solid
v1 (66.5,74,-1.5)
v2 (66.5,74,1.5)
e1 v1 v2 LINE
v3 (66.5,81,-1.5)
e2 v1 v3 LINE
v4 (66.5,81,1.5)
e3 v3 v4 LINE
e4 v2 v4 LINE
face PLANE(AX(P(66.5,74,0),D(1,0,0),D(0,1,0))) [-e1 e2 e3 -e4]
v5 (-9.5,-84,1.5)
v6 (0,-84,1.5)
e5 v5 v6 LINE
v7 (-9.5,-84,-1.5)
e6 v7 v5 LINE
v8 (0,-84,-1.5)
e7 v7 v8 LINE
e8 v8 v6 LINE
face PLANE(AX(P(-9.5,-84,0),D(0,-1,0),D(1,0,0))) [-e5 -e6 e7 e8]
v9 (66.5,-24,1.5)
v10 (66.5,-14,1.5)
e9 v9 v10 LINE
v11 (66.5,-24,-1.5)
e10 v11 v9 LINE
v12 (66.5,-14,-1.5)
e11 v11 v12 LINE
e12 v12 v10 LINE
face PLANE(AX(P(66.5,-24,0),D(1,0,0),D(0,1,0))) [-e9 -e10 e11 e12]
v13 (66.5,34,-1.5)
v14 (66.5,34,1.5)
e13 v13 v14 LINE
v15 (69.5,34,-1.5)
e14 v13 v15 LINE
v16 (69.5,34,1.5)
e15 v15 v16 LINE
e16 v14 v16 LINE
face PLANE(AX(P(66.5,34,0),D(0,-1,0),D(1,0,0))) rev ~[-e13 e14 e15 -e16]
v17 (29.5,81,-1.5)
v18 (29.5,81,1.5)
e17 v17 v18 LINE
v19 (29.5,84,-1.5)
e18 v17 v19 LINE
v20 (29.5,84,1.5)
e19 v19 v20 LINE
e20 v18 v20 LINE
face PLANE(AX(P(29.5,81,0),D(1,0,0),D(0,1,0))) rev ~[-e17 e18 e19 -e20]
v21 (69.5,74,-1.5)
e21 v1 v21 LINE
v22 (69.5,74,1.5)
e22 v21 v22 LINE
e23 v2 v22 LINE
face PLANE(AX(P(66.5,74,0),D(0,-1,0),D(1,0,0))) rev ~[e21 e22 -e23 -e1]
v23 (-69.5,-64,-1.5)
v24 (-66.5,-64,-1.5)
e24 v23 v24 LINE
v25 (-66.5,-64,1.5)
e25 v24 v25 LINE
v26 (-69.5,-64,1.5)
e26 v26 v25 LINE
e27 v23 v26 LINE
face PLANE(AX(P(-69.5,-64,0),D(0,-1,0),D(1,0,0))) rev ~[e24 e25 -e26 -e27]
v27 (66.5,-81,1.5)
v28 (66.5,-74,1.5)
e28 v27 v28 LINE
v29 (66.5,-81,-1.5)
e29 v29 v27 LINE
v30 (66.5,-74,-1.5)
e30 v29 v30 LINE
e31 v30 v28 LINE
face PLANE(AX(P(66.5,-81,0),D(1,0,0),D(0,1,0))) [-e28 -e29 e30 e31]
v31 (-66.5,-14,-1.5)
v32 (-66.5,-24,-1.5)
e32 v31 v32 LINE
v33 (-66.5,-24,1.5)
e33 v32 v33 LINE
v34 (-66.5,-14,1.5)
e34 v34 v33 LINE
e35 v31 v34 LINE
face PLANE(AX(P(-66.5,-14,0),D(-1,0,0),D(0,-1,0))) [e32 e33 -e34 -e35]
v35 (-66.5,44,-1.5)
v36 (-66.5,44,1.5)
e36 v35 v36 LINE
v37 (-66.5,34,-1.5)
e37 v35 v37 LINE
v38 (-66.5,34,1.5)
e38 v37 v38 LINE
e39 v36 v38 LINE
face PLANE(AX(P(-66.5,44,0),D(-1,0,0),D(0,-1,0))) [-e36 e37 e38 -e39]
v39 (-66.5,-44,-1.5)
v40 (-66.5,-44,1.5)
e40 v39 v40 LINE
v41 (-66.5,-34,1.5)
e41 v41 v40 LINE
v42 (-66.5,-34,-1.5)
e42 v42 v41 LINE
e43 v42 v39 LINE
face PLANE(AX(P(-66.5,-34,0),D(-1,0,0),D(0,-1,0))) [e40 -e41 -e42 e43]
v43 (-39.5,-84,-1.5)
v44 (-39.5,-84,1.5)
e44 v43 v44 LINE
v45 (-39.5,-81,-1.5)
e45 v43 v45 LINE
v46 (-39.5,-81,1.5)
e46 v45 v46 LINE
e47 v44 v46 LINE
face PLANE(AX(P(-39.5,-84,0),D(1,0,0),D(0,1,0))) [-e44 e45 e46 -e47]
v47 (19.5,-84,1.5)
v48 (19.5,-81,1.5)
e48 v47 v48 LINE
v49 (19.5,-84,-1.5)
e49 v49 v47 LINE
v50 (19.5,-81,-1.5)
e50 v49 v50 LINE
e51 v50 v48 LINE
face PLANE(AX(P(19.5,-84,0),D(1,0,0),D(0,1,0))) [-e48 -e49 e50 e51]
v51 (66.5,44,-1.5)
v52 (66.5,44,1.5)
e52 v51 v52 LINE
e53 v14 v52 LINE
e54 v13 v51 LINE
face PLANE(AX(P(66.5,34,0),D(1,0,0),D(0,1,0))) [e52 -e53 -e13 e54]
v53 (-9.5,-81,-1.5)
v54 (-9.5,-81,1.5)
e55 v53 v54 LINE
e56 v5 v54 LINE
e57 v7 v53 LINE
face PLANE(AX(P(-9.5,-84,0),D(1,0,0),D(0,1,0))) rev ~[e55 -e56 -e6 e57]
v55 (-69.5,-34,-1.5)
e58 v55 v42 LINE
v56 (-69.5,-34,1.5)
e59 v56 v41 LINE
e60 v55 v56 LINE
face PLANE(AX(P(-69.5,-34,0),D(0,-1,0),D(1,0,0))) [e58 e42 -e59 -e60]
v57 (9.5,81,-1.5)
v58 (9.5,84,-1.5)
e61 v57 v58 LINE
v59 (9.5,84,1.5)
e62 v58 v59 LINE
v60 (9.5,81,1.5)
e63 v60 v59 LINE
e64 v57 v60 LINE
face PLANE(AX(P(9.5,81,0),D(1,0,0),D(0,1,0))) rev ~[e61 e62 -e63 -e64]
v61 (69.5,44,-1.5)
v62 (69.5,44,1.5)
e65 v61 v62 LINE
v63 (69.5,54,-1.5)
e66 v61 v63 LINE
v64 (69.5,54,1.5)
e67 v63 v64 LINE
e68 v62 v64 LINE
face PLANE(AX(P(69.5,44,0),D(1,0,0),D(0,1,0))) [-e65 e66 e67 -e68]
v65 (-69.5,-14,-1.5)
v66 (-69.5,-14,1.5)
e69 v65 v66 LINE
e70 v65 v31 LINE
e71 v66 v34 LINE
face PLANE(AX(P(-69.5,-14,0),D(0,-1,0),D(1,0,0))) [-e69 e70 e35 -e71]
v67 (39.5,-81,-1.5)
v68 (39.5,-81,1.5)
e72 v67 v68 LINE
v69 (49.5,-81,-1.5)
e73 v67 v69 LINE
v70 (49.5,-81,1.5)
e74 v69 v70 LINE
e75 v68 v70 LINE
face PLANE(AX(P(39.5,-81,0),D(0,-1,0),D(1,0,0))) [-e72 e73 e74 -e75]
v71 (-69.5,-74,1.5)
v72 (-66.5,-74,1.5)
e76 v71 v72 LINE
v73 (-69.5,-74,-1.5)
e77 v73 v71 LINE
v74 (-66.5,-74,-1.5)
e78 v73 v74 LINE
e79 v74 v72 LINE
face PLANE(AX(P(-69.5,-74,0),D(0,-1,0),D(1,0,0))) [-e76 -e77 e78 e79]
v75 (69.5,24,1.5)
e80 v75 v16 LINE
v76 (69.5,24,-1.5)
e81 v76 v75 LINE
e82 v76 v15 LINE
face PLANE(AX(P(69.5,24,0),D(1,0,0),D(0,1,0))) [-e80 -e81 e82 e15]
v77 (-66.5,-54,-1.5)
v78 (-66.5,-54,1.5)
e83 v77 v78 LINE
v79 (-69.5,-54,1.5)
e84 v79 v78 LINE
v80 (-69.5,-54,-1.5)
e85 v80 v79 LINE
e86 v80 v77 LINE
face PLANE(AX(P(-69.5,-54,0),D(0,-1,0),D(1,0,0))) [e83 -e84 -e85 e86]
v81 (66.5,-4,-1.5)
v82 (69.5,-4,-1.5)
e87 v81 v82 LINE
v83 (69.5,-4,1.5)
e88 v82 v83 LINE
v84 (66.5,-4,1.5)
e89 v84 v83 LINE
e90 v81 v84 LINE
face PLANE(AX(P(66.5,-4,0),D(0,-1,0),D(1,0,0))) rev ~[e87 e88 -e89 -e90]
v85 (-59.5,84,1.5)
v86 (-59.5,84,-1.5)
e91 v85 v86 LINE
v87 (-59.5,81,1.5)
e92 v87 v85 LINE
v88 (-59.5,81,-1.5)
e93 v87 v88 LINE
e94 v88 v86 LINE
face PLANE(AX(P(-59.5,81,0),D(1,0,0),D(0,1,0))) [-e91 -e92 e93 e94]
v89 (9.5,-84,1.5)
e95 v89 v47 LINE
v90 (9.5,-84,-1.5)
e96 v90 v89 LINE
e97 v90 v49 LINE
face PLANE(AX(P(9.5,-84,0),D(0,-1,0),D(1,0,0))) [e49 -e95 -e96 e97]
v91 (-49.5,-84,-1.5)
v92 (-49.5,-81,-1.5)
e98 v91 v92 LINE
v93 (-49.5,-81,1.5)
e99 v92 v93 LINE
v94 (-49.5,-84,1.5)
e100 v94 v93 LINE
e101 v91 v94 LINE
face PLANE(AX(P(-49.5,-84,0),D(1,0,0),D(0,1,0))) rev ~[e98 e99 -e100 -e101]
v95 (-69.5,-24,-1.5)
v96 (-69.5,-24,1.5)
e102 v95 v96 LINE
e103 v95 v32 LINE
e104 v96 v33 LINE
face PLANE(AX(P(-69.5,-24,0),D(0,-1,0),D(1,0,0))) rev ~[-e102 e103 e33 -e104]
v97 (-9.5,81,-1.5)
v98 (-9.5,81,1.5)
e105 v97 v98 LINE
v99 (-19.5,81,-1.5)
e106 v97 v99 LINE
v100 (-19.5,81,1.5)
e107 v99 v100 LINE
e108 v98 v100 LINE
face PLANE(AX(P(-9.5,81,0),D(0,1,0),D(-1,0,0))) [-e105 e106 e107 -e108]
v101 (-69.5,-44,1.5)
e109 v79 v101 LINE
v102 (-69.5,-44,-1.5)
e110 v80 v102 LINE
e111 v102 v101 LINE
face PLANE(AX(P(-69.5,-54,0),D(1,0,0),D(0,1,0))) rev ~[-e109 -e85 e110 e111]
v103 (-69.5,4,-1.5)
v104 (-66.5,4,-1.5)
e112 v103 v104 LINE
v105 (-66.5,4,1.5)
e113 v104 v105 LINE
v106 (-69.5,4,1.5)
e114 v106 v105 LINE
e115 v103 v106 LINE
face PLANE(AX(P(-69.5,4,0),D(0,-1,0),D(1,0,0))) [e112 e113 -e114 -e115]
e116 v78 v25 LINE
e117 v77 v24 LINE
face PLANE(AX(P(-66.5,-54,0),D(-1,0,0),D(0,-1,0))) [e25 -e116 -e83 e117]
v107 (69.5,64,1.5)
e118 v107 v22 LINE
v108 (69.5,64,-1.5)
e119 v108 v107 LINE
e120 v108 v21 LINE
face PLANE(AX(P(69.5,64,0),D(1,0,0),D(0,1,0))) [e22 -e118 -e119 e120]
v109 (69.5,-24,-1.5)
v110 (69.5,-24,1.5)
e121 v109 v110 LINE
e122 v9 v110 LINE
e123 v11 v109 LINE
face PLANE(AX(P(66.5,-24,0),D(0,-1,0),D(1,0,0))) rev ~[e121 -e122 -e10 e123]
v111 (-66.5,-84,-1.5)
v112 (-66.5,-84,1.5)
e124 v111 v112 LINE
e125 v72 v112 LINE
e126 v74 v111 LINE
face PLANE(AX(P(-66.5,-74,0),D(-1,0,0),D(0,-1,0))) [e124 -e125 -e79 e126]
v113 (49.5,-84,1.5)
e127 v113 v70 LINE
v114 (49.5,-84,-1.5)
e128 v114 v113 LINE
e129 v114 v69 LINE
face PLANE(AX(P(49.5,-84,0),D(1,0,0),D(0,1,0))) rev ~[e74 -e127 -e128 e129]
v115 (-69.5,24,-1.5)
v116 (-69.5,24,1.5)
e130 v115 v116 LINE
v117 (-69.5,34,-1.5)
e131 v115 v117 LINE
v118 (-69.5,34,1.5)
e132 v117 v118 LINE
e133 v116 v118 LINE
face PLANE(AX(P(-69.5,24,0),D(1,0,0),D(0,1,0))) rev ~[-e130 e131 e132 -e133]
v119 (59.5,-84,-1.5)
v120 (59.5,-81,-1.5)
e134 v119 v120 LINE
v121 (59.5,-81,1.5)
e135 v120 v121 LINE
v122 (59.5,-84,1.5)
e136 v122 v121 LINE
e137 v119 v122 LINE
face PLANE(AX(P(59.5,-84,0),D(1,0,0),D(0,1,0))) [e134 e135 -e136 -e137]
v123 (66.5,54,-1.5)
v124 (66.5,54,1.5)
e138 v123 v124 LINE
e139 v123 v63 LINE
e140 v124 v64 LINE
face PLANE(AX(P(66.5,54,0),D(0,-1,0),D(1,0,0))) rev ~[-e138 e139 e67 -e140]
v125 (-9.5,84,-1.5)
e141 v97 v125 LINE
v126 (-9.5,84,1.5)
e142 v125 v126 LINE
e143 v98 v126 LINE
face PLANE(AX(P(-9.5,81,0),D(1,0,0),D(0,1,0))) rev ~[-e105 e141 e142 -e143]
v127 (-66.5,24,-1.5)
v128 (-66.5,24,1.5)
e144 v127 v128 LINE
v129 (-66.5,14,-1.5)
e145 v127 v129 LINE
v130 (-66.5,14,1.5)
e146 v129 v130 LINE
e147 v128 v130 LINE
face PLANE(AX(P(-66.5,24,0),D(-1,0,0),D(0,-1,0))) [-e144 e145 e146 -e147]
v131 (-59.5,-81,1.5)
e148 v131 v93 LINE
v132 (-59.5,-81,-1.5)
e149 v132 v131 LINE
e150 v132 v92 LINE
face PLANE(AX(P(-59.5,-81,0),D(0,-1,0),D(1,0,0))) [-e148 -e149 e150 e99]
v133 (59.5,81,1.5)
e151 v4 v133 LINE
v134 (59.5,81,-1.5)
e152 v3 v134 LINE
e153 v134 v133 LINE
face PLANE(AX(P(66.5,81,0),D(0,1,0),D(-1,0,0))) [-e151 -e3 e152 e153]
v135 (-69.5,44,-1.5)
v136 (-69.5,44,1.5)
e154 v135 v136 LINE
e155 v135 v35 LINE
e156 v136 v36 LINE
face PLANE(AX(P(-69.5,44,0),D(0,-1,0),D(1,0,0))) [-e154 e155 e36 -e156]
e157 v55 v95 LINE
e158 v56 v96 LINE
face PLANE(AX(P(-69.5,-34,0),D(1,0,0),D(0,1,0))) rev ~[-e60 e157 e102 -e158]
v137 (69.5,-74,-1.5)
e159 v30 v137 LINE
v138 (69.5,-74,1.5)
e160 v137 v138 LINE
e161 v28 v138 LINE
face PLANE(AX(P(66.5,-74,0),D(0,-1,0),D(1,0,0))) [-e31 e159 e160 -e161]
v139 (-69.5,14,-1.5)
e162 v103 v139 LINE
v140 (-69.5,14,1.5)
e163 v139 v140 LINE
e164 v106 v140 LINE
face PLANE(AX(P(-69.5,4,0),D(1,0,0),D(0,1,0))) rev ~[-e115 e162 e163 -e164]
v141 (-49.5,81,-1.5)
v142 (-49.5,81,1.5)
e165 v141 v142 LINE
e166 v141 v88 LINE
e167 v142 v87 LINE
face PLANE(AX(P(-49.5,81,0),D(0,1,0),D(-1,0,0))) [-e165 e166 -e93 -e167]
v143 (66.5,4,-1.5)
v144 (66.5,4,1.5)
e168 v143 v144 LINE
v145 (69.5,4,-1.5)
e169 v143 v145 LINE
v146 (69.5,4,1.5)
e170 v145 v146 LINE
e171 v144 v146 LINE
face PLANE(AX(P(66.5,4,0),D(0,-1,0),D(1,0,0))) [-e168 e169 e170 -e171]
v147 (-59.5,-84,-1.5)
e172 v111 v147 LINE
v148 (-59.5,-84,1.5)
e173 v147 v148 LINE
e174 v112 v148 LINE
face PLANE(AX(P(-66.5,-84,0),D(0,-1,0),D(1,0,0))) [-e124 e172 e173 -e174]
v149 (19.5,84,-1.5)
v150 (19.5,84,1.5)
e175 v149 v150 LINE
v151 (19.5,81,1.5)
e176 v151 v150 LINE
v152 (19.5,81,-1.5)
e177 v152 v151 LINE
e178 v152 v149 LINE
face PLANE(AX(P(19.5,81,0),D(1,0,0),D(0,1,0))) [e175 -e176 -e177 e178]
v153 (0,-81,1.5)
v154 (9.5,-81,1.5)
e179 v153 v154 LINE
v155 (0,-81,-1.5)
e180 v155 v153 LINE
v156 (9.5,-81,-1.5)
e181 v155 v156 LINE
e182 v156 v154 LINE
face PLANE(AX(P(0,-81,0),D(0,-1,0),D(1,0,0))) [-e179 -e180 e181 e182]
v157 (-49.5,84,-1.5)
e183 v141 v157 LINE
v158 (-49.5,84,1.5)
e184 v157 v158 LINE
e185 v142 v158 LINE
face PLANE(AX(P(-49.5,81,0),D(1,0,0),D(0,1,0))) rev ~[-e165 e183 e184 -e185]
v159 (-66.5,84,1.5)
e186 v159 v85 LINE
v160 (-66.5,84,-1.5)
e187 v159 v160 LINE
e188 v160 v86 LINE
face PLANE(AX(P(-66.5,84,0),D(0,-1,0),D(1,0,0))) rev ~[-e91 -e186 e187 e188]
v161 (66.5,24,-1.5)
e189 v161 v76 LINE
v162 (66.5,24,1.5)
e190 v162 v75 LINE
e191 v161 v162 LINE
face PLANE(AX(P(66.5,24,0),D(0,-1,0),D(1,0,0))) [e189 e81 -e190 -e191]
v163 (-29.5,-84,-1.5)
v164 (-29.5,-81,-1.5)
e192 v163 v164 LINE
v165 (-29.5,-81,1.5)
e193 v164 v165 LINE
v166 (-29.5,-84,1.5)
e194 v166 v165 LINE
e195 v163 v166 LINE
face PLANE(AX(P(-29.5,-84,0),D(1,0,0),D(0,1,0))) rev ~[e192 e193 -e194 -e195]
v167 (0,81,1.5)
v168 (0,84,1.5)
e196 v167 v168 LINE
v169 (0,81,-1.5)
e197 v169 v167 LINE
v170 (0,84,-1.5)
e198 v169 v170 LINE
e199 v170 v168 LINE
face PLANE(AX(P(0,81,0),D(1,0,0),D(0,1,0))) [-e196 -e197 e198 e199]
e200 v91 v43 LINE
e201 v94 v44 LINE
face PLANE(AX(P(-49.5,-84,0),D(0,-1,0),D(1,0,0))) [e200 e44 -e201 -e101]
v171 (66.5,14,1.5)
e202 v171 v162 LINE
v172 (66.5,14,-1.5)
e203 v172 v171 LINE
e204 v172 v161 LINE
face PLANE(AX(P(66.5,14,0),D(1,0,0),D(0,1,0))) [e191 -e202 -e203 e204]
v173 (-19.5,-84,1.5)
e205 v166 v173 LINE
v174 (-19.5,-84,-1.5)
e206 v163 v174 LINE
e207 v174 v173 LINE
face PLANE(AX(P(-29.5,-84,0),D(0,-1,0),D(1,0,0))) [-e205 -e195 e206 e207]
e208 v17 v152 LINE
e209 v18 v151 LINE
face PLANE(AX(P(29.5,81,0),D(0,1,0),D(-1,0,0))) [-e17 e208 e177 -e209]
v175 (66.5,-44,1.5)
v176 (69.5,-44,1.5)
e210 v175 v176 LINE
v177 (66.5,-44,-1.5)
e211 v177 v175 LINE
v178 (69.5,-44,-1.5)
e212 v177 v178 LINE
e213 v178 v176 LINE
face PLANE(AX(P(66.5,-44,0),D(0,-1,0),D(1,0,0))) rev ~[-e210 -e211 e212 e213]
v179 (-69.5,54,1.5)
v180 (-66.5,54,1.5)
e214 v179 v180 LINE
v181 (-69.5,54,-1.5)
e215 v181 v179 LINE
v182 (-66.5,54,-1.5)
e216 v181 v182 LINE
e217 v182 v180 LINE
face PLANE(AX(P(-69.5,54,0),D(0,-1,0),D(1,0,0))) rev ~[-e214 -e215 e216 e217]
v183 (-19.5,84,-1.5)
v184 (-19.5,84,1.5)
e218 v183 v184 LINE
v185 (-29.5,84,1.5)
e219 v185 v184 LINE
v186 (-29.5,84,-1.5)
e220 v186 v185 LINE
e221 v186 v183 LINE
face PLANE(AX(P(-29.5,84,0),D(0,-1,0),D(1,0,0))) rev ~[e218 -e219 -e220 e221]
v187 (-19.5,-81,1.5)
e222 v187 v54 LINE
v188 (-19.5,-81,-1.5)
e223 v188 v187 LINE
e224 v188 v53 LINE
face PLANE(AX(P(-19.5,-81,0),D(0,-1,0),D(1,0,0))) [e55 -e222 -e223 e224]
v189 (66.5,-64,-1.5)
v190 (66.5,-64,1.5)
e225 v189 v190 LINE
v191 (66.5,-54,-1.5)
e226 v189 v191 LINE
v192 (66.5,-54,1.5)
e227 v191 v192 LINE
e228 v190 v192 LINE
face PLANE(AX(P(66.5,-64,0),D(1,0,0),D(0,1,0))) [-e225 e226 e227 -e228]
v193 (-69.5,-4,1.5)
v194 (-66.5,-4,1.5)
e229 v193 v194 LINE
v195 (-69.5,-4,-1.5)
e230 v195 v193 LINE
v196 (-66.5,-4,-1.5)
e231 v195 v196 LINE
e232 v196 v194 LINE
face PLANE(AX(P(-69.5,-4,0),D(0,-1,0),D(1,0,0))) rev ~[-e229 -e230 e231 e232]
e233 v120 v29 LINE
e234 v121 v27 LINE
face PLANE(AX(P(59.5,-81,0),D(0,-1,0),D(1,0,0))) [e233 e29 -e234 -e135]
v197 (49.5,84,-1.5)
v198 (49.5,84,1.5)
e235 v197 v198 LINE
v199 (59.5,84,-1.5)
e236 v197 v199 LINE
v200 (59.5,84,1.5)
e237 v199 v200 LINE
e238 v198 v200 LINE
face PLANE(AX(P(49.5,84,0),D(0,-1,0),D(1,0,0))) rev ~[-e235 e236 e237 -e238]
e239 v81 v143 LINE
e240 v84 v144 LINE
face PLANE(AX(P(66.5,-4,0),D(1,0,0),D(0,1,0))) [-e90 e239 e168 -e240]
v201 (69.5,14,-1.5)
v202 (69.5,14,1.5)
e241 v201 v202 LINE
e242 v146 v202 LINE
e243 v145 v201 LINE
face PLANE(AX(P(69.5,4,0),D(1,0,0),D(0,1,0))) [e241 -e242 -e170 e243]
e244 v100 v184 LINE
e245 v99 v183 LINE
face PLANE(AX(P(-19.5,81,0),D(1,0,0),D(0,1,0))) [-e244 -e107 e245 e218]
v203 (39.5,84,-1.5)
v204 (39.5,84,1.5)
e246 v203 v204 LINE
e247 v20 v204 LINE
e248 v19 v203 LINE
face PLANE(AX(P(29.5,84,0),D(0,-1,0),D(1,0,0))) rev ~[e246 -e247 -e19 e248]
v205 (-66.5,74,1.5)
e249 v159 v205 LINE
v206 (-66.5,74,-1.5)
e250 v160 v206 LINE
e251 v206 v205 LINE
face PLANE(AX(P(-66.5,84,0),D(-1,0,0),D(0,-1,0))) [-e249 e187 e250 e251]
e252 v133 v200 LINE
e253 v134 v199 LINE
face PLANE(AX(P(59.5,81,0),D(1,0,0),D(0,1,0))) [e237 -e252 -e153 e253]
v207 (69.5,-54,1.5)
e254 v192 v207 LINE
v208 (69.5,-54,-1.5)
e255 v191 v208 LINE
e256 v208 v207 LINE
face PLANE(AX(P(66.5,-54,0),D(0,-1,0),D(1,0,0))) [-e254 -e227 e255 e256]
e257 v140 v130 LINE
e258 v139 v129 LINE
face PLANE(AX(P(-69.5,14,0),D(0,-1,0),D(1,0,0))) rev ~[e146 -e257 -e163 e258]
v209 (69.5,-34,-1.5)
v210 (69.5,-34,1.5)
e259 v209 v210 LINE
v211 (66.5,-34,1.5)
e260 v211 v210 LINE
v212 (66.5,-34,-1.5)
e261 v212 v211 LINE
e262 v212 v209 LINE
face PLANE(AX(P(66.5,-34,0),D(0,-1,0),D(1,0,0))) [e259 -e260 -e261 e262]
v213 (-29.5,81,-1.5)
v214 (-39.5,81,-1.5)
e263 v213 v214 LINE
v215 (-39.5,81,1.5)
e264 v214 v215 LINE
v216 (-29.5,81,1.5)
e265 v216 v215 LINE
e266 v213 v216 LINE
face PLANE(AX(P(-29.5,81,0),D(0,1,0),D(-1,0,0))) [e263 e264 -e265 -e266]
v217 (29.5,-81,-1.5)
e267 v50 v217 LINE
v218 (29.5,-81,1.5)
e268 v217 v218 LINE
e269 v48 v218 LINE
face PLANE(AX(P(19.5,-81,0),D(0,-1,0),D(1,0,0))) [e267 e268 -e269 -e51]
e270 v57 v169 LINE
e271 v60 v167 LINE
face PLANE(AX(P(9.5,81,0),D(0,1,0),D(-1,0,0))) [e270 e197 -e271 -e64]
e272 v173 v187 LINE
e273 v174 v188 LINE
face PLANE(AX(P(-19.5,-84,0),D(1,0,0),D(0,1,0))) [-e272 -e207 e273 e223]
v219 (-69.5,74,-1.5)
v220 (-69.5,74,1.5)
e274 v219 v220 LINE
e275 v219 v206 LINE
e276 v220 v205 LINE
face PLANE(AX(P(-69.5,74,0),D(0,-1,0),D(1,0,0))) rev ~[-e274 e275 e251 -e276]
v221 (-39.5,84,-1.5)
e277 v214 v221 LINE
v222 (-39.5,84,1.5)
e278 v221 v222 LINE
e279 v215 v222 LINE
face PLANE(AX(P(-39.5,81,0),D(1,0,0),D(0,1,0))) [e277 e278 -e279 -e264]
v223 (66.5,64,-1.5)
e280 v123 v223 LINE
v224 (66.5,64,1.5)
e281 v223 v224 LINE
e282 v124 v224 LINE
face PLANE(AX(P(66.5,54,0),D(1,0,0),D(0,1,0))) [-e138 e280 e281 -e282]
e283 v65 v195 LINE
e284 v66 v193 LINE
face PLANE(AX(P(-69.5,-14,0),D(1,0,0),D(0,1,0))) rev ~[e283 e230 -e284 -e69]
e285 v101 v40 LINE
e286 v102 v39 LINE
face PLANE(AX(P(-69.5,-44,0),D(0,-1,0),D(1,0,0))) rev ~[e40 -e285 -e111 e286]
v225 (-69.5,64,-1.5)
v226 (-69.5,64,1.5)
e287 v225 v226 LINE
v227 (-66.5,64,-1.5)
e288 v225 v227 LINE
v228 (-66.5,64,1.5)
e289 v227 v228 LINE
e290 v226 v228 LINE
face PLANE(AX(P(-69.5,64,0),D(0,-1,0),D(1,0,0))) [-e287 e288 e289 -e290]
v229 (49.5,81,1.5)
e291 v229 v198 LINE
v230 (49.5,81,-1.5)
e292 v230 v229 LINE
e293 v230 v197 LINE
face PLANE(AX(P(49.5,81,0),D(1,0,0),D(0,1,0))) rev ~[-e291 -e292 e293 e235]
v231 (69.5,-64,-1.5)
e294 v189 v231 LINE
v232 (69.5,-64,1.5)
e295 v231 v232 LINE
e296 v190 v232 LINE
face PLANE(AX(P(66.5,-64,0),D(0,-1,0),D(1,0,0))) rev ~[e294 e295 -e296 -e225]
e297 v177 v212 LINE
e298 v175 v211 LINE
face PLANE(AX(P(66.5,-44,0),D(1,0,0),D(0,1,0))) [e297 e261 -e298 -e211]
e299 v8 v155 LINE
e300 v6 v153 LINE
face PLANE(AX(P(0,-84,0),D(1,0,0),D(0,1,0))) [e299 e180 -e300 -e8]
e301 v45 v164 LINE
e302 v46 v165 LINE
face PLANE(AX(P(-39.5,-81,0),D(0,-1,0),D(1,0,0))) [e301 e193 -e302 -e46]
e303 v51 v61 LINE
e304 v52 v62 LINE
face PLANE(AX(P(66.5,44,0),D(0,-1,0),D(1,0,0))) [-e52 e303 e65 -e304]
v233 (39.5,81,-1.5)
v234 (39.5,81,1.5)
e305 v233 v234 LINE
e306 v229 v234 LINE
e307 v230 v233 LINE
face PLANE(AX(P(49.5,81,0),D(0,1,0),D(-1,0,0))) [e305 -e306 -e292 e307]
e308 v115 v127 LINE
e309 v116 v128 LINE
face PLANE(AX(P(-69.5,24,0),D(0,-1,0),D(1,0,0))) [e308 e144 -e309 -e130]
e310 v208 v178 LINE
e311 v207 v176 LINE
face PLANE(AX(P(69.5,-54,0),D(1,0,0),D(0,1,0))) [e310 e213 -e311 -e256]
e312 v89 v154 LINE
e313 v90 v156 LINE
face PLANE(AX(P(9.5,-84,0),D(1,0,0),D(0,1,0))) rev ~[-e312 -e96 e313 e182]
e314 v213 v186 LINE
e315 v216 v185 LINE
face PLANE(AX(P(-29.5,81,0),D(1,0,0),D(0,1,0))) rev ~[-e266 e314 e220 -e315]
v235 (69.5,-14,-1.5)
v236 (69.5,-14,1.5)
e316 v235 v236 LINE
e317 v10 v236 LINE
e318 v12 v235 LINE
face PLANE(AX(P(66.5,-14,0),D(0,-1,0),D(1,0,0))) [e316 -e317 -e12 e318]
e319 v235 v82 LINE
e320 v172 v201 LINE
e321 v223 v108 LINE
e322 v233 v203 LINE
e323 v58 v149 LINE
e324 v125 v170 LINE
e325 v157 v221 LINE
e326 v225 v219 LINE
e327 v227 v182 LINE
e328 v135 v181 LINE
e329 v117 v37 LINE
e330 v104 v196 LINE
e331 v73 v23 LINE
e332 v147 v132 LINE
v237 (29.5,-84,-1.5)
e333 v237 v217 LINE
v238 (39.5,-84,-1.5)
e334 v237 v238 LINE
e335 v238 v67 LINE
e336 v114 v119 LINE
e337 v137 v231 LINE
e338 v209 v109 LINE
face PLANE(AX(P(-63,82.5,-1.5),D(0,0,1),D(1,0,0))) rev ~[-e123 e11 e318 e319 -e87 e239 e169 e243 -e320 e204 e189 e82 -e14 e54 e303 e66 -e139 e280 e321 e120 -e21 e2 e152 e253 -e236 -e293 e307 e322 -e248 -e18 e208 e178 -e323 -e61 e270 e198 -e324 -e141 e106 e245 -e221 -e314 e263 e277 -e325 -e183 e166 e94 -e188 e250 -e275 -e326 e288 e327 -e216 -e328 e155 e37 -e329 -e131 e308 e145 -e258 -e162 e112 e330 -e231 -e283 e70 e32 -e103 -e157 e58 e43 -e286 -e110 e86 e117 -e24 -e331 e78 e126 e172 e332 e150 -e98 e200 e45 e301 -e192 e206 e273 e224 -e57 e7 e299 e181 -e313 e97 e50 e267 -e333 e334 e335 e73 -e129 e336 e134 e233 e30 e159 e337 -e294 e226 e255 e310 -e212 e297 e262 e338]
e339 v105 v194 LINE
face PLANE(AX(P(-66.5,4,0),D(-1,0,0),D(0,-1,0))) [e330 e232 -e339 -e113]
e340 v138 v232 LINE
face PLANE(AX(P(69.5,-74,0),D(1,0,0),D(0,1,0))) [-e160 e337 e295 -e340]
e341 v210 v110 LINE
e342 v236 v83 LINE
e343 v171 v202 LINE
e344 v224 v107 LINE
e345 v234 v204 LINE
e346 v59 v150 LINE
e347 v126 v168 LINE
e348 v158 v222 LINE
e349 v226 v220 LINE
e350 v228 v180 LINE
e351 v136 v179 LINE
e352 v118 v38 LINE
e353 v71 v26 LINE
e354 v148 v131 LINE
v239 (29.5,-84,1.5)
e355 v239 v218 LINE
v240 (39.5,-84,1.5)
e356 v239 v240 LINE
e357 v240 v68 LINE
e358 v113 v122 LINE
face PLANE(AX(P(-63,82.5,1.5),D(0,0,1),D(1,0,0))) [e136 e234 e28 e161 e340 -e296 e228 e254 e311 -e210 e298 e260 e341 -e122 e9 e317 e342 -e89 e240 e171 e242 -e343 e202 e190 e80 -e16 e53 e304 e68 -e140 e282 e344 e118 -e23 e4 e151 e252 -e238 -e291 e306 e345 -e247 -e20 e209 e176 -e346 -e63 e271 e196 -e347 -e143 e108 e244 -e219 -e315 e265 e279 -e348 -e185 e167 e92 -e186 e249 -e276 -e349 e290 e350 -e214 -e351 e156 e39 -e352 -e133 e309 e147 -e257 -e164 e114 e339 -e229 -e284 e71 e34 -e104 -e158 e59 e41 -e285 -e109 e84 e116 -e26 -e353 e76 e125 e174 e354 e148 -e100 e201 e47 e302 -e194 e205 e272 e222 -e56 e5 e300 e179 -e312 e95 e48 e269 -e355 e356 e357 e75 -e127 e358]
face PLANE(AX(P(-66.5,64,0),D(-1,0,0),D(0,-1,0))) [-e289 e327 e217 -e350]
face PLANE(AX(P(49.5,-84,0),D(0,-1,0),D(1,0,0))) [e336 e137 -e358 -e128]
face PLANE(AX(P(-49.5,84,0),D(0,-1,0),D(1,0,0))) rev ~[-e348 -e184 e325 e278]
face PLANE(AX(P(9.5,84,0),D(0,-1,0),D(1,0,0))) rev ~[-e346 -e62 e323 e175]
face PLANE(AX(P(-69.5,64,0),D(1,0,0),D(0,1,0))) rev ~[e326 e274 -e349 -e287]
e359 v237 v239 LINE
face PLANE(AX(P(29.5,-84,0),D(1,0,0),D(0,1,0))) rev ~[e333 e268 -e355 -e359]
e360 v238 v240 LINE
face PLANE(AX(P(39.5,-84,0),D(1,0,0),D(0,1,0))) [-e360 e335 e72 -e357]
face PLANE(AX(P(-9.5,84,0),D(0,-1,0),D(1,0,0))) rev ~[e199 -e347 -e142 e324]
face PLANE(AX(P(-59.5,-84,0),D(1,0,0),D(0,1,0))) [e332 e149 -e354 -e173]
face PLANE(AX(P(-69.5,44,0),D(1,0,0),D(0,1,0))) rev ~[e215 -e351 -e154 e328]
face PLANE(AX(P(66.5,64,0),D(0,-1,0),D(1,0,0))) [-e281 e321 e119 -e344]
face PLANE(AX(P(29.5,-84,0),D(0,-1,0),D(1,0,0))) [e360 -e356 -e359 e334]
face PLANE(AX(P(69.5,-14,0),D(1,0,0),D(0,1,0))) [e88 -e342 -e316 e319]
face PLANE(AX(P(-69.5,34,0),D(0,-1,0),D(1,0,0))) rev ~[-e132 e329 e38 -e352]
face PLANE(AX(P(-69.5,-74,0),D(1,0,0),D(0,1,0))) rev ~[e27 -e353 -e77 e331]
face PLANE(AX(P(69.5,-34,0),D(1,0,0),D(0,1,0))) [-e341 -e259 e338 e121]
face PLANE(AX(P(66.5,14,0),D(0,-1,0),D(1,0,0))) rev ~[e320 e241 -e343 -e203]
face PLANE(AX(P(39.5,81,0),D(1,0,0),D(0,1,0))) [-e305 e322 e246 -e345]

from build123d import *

# Parameters (mm, degrees)
F0_W     = 7
F0_H     = 3
F0_W_2   = 3
F0_H_2   = 10
F0_W_3   = 10
F0_W_4   = 9.5
F1_DEPTH = 1.5


with BuildPart() as f1:
    # F0 (on Top) → F1 (new body, symmetric)
    with BuildSketch(Plane.XY):
        with Locations((-63, 82.5)):
            Rectangle(F0_W, F0_H)
        Polygon((-59.5, 81), (-66.5, 81), (-66.5, 74), (-66.5, 64), (-66.5, 54), (-66.5, 44), (-66.5, 34), (-66.5, 24), (-66.5, 14), (-66.5, 4), (-66.5, 0), (0, 0), (0, 81), (-9.5, 81), (-19.5, 81), (-29.5, 81), (-39.5, 81), (-49.5, 81), align=None)
        with Locations((-68, 69)):
            Rectangle(F0_W_2, F0_H_2)
        with Locations((-44.5, 82.5)):
            Rectangle(F0_W_3, F0_H)
        with Locations((-68, 49)):
            Rectangle(F0_W_2, F0_H_2)
        with Locations((-24.5, 82.5)):
            Rectangle(F0_W_3, F0_H)
        with Locations((-68, 29)):
            Rectangle(F0_W_2, F0_H_2)
        with Locations((-4.75, 82.5)):
            Rectangle(F0_W_4, F0_H)
        with Locations((-68, 9)):
            Rectangle(F0_W_2, F0_H_2)
        Polygon((9.5, 81), (0, 81), (0, 0), (66.5, 0), (66.5, 4), (66.5, 14), (66.5, 24), (66.5, 34), (66.5, 44), (66.5, 54), (66.5, 64), (66.5, 74), (66.5, 81), (59.5, 81), (49.5, 81), (39.5, 81), (29.5, 81), (19.5, 81), align=None)
        with Locations((14.5, 82.5)):
            Rectangle(F0_W_3, F0_H)
        Polygon((0, -81), (0, 0), (-66.5, 0), (-66.5, -4), (-66.5, -14), (-66.5, -24), (-66.5, -34), (-66.5, -44), (-66.5, -54), (-66.5, -64), (-66.5, -74), (-66.5, -81), (-59.5, -81), (-49.5, -81), (-39.5, -81), (-29.5, -81), (-19.5, -81), (-9.5, -81), align=None)
        Polygon((66.5, 0), (0, 0), (0, -81), (9.5, -81), (19.5, -81), (29.5, -81), (39.5, -81), (49.5, -81), (59.5, -81), (66.5, -81), (66.5, -74), (66.5, -64), (66.5, -54), (66.5, -44), (66.5, -34), (66.5, -24), (66.5, -14), (66.5, -4), align=None)
        with Locations((-4.75, -82.5)):
            Rectangle(F0_W_4, F0_H)
        with Locations((34.5, 82.5)):
            Rectangle(F0_W_3, F0_H)
        with Locations((-68, -9)):
            Rectangle(F0_W_2, F0_H_2)
        with Locations((68, 9)):
            Rectangle(F0_W_2, F0_H_2)
        with Locations((68, -9)):
            Rectangle(F0_W_2, F0_H_2)
        with Locations((14.5, -82.5)):
            Rectangle(F0_W_3, F0_H)
        with Locations((-24.5, -82.5)):
            Rectangle(F0_W_3, F0_H)
        with Locations((54.5, 82.5)):
            Rectangle(F0_W_3, F0_H)
        with Locations((-68, -29)):
            Rectangle(F0_W_2, F0_H_2)
        with Locations((68, 29)):
            Rectangle(F0_W_2, F0_H_2)
        with Locations((68, -29)):
            Rectangle(F0_W_2, F0_H_2)
        with Locations((34.5, -82.5)):
            Rectangle(F0_W_3, F0_H)
        with Locations((-44.5, -82.5)):
            Rectangle(F0_W_3, F0_H)
        with Locations((-68, -49)):
            Rectangle(F0_W_2, F0_H_2)
        with Locations((68, 49)):
            Rectangle(F0_W_2, F0_H_2)
        with Locations((68, -49)):
            Rectangle(F0_W_2, F0_H_2)
        with Locations((54.5, -82.5)):
            Rectangle(F0_W_3, F0_H)
        with Locations((-63, -82.5)):
            Rectangle(F0_W, F0_H)
        with Locations((68, 69)):
            Rectangle(F0_W_2, F0_H_2)
        with Locations((-68, -69)):
            Rectangle(F0_W_2, F0_H_2)
        with Locations((68, -69)):
            Rectangle(F0_W_2, F0_H_2)
    extrude(amount=F1_DEPTH, both=True)


solid = f1.part
